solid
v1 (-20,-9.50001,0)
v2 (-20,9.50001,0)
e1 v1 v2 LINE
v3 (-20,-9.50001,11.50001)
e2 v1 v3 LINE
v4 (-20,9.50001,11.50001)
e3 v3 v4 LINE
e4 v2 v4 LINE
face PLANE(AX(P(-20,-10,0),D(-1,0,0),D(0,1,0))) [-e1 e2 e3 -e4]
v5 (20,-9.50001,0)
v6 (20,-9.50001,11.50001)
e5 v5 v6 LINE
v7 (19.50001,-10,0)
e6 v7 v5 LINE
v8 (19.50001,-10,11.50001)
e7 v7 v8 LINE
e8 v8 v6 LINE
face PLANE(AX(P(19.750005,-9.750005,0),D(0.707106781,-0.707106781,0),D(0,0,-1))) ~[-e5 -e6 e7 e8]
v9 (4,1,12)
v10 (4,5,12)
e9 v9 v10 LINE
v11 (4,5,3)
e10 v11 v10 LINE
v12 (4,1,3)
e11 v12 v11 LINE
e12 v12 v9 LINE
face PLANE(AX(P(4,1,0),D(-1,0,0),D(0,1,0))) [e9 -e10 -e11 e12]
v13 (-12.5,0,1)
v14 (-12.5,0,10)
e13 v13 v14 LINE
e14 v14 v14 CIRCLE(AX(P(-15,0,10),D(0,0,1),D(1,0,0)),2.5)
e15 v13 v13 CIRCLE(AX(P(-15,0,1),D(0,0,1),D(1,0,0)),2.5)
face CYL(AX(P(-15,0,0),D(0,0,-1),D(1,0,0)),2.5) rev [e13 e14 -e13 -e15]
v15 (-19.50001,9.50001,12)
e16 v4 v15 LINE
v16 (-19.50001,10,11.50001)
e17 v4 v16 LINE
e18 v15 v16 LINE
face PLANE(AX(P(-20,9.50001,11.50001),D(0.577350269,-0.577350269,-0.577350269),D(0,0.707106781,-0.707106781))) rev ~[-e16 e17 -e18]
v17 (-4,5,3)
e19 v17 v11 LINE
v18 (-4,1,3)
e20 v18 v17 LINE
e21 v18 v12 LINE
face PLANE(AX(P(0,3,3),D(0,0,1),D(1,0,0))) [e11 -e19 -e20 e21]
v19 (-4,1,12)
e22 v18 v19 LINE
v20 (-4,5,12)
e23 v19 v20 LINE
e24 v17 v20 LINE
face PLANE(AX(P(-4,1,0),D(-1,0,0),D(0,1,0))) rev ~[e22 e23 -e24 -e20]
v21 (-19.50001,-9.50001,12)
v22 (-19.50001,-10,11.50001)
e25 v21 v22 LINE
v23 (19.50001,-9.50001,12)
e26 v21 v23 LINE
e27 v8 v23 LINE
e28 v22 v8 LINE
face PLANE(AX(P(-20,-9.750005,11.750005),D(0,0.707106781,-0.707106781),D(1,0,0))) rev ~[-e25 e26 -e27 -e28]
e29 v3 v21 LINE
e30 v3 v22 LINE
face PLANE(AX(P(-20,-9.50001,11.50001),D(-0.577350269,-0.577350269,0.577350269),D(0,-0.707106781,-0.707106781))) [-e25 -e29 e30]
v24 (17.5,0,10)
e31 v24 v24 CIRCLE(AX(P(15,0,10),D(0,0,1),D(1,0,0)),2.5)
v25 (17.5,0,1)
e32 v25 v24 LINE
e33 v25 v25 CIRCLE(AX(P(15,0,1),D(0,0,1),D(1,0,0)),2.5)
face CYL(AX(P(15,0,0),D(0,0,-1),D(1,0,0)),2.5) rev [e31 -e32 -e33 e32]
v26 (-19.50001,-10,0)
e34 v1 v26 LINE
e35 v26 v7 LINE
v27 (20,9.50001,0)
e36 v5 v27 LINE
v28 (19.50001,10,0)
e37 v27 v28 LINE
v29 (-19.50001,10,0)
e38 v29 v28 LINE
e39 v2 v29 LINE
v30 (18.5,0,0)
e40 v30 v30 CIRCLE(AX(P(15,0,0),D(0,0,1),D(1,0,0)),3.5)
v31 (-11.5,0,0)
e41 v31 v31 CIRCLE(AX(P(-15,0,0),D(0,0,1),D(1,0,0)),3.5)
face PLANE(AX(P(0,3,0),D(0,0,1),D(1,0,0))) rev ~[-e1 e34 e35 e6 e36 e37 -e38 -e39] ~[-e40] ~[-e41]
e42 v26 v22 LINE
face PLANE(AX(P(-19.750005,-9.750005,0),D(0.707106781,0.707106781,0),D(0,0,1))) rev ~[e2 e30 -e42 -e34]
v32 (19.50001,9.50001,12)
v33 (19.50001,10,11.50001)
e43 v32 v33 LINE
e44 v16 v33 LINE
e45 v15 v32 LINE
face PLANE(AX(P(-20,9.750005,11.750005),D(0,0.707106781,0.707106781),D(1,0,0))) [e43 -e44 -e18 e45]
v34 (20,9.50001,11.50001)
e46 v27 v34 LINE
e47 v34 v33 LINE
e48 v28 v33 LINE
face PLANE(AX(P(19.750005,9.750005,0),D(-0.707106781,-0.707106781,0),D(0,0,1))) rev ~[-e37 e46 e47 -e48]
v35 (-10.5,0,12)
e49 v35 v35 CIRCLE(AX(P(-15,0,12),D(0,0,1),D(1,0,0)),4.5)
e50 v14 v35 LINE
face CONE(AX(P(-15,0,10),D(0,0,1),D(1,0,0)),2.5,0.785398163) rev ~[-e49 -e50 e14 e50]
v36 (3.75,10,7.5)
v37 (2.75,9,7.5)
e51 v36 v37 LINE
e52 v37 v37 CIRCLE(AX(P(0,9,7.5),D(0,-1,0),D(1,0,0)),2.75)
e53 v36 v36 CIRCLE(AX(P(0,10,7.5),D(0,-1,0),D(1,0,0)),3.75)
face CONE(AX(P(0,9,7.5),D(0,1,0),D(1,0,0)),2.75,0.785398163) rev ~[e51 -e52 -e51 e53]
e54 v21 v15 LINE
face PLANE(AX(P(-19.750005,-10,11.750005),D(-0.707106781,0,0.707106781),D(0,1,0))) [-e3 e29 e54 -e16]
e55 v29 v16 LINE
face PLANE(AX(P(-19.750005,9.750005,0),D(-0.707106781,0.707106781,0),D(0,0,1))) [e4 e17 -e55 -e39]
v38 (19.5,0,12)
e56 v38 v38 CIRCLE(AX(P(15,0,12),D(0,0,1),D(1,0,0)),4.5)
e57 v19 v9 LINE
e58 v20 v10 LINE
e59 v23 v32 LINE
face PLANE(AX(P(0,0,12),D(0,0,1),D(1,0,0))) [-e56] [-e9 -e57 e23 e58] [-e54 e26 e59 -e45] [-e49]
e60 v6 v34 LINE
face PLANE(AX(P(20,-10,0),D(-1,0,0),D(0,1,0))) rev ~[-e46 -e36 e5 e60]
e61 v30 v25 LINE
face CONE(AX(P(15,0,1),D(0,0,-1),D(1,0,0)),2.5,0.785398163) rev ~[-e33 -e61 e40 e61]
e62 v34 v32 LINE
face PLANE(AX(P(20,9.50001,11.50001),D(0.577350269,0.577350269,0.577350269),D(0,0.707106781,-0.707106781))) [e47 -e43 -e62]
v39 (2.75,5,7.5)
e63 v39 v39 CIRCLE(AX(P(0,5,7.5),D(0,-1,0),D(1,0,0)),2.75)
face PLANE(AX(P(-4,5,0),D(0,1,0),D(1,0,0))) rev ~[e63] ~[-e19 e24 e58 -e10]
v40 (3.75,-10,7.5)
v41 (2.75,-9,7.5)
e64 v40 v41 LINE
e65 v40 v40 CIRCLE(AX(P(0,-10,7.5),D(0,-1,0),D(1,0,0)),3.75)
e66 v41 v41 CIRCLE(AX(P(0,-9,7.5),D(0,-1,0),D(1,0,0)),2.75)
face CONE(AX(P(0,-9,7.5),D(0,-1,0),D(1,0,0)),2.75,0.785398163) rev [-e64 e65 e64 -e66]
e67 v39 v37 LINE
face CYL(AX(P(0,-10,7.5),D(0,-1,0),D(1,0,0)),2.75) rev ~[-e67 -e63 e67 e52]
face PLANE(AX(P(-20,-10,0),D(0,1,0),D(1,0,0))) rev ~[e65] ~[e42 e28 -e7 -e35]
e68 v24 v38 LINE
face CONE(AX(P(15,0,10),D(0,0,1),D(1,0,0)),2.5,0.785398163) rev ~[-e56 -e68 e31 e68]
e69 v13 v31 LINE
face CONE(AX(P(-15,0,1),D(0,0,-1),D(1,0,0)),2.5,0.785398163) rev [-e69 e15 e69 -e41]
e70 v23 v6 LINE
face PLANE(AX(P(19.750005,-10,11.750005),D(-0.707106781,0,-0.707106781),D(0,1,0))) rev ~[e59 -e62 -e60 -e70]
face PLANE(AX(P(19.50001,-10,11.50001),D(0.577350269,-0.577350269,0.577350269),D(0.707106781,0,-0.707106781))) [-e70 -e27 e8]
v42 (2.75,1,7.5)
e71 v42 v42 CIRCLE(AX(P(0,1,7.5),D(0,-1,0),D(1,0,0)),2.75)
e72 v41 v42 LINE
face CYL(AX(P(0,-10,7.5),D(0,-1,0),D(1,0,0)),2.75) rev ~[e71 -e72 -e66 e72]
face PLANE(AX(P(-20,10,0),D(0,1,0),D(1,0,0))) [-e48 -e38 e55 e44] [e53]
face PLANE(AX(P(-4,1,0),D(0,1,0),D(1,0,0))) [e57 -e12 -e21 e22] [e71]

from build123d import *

# Parameters (mm, degrees)
F0_W     = 40
F0_H     = 20
F0_R     = 2.5
F0_W_2   = 8
F0_H_2   = 4
F1_DEPTH = 12
F2_DEPTH = 3
F3_R     = 2.75
F4_DEPTH = 25
F5_SIZE  = 2
F6_SIZE  = 1
F7_SIZE  = 0.49999


# Not quite as in the source:
# - a fillet or chamfer is up to 0.001 mm smaller than in the source, because OpenCascade refuses the exact size


with BuildPart() as f1:
    # F0 (on Top) → F1 (new body)
    with BuildSketch(Plane.XY):
        Rectangle(F0_W, F0_H)
        with Locations((-15, 0)):
            Circle(F0_R, mode=Mode.SUBTRACT)
        with Locations((0, 3)):
            Rectangle(F0_W_2, F0_H_2, mode=Mode.SUBTRACT)
        with Locations((15, 0)):
            Circle(F0_R, mode=Mode.SUBTRACT)
    extrude(amount=F1_DEPTH)

    # F0 (on Top) → F2 (join)
    with BuildSketch(Plane.XY):
        with Locations((0, 3)):
            Rectangle(F0_W_2, F0_H_2)
    extrude(amount=F2_DEPTH)

    # F3 (on face) → F4 (cut)
    with BuildSketch(Plane.XZ.offset(10)):
        with Locations((0, 7.5)):
            Circle(F3_R)
    extrude(amount=-F4_DEPTH, mode=Mode.SUBTRACT)

    # F5
    f5_edges = [f1.edges().sort_by_distance(p)[0] for p in [
        (-17.5, 0, 12),
        (12.5, 0, 12),
    ]]
    chamfer(f5_edges, length=F5_SIZE)

    # F6
    f6_edges = [f1.edges().sort_by_distance(p)[0] for p in [
        (-2.75, 10, 7.5),
        (-17.5, 0, 0),
        (12.5, 0, 0),
        (-2.75, -10, 7.5),
    ]]
    chamfer(f6_edges, length=F6_SIZE)

    # F7 (size 0.5 in the source; OpenCascade refuses exactly that, so slightly less here)
    f7_edges = [f1.edges().sort_by_distance(p)[0] for p in [
        (0, 10, 12),
        (20, 0, 12),
        (0, -10, 12),
        (-20, 0, 12),
        (-20, 10, 6),
        (20, 10, 6),
        (20, -10, 6),
        (-20, -10, 6),
    ]]
    chamfer(f7_edges, length=F7_SIZE)


solid = f1.part
